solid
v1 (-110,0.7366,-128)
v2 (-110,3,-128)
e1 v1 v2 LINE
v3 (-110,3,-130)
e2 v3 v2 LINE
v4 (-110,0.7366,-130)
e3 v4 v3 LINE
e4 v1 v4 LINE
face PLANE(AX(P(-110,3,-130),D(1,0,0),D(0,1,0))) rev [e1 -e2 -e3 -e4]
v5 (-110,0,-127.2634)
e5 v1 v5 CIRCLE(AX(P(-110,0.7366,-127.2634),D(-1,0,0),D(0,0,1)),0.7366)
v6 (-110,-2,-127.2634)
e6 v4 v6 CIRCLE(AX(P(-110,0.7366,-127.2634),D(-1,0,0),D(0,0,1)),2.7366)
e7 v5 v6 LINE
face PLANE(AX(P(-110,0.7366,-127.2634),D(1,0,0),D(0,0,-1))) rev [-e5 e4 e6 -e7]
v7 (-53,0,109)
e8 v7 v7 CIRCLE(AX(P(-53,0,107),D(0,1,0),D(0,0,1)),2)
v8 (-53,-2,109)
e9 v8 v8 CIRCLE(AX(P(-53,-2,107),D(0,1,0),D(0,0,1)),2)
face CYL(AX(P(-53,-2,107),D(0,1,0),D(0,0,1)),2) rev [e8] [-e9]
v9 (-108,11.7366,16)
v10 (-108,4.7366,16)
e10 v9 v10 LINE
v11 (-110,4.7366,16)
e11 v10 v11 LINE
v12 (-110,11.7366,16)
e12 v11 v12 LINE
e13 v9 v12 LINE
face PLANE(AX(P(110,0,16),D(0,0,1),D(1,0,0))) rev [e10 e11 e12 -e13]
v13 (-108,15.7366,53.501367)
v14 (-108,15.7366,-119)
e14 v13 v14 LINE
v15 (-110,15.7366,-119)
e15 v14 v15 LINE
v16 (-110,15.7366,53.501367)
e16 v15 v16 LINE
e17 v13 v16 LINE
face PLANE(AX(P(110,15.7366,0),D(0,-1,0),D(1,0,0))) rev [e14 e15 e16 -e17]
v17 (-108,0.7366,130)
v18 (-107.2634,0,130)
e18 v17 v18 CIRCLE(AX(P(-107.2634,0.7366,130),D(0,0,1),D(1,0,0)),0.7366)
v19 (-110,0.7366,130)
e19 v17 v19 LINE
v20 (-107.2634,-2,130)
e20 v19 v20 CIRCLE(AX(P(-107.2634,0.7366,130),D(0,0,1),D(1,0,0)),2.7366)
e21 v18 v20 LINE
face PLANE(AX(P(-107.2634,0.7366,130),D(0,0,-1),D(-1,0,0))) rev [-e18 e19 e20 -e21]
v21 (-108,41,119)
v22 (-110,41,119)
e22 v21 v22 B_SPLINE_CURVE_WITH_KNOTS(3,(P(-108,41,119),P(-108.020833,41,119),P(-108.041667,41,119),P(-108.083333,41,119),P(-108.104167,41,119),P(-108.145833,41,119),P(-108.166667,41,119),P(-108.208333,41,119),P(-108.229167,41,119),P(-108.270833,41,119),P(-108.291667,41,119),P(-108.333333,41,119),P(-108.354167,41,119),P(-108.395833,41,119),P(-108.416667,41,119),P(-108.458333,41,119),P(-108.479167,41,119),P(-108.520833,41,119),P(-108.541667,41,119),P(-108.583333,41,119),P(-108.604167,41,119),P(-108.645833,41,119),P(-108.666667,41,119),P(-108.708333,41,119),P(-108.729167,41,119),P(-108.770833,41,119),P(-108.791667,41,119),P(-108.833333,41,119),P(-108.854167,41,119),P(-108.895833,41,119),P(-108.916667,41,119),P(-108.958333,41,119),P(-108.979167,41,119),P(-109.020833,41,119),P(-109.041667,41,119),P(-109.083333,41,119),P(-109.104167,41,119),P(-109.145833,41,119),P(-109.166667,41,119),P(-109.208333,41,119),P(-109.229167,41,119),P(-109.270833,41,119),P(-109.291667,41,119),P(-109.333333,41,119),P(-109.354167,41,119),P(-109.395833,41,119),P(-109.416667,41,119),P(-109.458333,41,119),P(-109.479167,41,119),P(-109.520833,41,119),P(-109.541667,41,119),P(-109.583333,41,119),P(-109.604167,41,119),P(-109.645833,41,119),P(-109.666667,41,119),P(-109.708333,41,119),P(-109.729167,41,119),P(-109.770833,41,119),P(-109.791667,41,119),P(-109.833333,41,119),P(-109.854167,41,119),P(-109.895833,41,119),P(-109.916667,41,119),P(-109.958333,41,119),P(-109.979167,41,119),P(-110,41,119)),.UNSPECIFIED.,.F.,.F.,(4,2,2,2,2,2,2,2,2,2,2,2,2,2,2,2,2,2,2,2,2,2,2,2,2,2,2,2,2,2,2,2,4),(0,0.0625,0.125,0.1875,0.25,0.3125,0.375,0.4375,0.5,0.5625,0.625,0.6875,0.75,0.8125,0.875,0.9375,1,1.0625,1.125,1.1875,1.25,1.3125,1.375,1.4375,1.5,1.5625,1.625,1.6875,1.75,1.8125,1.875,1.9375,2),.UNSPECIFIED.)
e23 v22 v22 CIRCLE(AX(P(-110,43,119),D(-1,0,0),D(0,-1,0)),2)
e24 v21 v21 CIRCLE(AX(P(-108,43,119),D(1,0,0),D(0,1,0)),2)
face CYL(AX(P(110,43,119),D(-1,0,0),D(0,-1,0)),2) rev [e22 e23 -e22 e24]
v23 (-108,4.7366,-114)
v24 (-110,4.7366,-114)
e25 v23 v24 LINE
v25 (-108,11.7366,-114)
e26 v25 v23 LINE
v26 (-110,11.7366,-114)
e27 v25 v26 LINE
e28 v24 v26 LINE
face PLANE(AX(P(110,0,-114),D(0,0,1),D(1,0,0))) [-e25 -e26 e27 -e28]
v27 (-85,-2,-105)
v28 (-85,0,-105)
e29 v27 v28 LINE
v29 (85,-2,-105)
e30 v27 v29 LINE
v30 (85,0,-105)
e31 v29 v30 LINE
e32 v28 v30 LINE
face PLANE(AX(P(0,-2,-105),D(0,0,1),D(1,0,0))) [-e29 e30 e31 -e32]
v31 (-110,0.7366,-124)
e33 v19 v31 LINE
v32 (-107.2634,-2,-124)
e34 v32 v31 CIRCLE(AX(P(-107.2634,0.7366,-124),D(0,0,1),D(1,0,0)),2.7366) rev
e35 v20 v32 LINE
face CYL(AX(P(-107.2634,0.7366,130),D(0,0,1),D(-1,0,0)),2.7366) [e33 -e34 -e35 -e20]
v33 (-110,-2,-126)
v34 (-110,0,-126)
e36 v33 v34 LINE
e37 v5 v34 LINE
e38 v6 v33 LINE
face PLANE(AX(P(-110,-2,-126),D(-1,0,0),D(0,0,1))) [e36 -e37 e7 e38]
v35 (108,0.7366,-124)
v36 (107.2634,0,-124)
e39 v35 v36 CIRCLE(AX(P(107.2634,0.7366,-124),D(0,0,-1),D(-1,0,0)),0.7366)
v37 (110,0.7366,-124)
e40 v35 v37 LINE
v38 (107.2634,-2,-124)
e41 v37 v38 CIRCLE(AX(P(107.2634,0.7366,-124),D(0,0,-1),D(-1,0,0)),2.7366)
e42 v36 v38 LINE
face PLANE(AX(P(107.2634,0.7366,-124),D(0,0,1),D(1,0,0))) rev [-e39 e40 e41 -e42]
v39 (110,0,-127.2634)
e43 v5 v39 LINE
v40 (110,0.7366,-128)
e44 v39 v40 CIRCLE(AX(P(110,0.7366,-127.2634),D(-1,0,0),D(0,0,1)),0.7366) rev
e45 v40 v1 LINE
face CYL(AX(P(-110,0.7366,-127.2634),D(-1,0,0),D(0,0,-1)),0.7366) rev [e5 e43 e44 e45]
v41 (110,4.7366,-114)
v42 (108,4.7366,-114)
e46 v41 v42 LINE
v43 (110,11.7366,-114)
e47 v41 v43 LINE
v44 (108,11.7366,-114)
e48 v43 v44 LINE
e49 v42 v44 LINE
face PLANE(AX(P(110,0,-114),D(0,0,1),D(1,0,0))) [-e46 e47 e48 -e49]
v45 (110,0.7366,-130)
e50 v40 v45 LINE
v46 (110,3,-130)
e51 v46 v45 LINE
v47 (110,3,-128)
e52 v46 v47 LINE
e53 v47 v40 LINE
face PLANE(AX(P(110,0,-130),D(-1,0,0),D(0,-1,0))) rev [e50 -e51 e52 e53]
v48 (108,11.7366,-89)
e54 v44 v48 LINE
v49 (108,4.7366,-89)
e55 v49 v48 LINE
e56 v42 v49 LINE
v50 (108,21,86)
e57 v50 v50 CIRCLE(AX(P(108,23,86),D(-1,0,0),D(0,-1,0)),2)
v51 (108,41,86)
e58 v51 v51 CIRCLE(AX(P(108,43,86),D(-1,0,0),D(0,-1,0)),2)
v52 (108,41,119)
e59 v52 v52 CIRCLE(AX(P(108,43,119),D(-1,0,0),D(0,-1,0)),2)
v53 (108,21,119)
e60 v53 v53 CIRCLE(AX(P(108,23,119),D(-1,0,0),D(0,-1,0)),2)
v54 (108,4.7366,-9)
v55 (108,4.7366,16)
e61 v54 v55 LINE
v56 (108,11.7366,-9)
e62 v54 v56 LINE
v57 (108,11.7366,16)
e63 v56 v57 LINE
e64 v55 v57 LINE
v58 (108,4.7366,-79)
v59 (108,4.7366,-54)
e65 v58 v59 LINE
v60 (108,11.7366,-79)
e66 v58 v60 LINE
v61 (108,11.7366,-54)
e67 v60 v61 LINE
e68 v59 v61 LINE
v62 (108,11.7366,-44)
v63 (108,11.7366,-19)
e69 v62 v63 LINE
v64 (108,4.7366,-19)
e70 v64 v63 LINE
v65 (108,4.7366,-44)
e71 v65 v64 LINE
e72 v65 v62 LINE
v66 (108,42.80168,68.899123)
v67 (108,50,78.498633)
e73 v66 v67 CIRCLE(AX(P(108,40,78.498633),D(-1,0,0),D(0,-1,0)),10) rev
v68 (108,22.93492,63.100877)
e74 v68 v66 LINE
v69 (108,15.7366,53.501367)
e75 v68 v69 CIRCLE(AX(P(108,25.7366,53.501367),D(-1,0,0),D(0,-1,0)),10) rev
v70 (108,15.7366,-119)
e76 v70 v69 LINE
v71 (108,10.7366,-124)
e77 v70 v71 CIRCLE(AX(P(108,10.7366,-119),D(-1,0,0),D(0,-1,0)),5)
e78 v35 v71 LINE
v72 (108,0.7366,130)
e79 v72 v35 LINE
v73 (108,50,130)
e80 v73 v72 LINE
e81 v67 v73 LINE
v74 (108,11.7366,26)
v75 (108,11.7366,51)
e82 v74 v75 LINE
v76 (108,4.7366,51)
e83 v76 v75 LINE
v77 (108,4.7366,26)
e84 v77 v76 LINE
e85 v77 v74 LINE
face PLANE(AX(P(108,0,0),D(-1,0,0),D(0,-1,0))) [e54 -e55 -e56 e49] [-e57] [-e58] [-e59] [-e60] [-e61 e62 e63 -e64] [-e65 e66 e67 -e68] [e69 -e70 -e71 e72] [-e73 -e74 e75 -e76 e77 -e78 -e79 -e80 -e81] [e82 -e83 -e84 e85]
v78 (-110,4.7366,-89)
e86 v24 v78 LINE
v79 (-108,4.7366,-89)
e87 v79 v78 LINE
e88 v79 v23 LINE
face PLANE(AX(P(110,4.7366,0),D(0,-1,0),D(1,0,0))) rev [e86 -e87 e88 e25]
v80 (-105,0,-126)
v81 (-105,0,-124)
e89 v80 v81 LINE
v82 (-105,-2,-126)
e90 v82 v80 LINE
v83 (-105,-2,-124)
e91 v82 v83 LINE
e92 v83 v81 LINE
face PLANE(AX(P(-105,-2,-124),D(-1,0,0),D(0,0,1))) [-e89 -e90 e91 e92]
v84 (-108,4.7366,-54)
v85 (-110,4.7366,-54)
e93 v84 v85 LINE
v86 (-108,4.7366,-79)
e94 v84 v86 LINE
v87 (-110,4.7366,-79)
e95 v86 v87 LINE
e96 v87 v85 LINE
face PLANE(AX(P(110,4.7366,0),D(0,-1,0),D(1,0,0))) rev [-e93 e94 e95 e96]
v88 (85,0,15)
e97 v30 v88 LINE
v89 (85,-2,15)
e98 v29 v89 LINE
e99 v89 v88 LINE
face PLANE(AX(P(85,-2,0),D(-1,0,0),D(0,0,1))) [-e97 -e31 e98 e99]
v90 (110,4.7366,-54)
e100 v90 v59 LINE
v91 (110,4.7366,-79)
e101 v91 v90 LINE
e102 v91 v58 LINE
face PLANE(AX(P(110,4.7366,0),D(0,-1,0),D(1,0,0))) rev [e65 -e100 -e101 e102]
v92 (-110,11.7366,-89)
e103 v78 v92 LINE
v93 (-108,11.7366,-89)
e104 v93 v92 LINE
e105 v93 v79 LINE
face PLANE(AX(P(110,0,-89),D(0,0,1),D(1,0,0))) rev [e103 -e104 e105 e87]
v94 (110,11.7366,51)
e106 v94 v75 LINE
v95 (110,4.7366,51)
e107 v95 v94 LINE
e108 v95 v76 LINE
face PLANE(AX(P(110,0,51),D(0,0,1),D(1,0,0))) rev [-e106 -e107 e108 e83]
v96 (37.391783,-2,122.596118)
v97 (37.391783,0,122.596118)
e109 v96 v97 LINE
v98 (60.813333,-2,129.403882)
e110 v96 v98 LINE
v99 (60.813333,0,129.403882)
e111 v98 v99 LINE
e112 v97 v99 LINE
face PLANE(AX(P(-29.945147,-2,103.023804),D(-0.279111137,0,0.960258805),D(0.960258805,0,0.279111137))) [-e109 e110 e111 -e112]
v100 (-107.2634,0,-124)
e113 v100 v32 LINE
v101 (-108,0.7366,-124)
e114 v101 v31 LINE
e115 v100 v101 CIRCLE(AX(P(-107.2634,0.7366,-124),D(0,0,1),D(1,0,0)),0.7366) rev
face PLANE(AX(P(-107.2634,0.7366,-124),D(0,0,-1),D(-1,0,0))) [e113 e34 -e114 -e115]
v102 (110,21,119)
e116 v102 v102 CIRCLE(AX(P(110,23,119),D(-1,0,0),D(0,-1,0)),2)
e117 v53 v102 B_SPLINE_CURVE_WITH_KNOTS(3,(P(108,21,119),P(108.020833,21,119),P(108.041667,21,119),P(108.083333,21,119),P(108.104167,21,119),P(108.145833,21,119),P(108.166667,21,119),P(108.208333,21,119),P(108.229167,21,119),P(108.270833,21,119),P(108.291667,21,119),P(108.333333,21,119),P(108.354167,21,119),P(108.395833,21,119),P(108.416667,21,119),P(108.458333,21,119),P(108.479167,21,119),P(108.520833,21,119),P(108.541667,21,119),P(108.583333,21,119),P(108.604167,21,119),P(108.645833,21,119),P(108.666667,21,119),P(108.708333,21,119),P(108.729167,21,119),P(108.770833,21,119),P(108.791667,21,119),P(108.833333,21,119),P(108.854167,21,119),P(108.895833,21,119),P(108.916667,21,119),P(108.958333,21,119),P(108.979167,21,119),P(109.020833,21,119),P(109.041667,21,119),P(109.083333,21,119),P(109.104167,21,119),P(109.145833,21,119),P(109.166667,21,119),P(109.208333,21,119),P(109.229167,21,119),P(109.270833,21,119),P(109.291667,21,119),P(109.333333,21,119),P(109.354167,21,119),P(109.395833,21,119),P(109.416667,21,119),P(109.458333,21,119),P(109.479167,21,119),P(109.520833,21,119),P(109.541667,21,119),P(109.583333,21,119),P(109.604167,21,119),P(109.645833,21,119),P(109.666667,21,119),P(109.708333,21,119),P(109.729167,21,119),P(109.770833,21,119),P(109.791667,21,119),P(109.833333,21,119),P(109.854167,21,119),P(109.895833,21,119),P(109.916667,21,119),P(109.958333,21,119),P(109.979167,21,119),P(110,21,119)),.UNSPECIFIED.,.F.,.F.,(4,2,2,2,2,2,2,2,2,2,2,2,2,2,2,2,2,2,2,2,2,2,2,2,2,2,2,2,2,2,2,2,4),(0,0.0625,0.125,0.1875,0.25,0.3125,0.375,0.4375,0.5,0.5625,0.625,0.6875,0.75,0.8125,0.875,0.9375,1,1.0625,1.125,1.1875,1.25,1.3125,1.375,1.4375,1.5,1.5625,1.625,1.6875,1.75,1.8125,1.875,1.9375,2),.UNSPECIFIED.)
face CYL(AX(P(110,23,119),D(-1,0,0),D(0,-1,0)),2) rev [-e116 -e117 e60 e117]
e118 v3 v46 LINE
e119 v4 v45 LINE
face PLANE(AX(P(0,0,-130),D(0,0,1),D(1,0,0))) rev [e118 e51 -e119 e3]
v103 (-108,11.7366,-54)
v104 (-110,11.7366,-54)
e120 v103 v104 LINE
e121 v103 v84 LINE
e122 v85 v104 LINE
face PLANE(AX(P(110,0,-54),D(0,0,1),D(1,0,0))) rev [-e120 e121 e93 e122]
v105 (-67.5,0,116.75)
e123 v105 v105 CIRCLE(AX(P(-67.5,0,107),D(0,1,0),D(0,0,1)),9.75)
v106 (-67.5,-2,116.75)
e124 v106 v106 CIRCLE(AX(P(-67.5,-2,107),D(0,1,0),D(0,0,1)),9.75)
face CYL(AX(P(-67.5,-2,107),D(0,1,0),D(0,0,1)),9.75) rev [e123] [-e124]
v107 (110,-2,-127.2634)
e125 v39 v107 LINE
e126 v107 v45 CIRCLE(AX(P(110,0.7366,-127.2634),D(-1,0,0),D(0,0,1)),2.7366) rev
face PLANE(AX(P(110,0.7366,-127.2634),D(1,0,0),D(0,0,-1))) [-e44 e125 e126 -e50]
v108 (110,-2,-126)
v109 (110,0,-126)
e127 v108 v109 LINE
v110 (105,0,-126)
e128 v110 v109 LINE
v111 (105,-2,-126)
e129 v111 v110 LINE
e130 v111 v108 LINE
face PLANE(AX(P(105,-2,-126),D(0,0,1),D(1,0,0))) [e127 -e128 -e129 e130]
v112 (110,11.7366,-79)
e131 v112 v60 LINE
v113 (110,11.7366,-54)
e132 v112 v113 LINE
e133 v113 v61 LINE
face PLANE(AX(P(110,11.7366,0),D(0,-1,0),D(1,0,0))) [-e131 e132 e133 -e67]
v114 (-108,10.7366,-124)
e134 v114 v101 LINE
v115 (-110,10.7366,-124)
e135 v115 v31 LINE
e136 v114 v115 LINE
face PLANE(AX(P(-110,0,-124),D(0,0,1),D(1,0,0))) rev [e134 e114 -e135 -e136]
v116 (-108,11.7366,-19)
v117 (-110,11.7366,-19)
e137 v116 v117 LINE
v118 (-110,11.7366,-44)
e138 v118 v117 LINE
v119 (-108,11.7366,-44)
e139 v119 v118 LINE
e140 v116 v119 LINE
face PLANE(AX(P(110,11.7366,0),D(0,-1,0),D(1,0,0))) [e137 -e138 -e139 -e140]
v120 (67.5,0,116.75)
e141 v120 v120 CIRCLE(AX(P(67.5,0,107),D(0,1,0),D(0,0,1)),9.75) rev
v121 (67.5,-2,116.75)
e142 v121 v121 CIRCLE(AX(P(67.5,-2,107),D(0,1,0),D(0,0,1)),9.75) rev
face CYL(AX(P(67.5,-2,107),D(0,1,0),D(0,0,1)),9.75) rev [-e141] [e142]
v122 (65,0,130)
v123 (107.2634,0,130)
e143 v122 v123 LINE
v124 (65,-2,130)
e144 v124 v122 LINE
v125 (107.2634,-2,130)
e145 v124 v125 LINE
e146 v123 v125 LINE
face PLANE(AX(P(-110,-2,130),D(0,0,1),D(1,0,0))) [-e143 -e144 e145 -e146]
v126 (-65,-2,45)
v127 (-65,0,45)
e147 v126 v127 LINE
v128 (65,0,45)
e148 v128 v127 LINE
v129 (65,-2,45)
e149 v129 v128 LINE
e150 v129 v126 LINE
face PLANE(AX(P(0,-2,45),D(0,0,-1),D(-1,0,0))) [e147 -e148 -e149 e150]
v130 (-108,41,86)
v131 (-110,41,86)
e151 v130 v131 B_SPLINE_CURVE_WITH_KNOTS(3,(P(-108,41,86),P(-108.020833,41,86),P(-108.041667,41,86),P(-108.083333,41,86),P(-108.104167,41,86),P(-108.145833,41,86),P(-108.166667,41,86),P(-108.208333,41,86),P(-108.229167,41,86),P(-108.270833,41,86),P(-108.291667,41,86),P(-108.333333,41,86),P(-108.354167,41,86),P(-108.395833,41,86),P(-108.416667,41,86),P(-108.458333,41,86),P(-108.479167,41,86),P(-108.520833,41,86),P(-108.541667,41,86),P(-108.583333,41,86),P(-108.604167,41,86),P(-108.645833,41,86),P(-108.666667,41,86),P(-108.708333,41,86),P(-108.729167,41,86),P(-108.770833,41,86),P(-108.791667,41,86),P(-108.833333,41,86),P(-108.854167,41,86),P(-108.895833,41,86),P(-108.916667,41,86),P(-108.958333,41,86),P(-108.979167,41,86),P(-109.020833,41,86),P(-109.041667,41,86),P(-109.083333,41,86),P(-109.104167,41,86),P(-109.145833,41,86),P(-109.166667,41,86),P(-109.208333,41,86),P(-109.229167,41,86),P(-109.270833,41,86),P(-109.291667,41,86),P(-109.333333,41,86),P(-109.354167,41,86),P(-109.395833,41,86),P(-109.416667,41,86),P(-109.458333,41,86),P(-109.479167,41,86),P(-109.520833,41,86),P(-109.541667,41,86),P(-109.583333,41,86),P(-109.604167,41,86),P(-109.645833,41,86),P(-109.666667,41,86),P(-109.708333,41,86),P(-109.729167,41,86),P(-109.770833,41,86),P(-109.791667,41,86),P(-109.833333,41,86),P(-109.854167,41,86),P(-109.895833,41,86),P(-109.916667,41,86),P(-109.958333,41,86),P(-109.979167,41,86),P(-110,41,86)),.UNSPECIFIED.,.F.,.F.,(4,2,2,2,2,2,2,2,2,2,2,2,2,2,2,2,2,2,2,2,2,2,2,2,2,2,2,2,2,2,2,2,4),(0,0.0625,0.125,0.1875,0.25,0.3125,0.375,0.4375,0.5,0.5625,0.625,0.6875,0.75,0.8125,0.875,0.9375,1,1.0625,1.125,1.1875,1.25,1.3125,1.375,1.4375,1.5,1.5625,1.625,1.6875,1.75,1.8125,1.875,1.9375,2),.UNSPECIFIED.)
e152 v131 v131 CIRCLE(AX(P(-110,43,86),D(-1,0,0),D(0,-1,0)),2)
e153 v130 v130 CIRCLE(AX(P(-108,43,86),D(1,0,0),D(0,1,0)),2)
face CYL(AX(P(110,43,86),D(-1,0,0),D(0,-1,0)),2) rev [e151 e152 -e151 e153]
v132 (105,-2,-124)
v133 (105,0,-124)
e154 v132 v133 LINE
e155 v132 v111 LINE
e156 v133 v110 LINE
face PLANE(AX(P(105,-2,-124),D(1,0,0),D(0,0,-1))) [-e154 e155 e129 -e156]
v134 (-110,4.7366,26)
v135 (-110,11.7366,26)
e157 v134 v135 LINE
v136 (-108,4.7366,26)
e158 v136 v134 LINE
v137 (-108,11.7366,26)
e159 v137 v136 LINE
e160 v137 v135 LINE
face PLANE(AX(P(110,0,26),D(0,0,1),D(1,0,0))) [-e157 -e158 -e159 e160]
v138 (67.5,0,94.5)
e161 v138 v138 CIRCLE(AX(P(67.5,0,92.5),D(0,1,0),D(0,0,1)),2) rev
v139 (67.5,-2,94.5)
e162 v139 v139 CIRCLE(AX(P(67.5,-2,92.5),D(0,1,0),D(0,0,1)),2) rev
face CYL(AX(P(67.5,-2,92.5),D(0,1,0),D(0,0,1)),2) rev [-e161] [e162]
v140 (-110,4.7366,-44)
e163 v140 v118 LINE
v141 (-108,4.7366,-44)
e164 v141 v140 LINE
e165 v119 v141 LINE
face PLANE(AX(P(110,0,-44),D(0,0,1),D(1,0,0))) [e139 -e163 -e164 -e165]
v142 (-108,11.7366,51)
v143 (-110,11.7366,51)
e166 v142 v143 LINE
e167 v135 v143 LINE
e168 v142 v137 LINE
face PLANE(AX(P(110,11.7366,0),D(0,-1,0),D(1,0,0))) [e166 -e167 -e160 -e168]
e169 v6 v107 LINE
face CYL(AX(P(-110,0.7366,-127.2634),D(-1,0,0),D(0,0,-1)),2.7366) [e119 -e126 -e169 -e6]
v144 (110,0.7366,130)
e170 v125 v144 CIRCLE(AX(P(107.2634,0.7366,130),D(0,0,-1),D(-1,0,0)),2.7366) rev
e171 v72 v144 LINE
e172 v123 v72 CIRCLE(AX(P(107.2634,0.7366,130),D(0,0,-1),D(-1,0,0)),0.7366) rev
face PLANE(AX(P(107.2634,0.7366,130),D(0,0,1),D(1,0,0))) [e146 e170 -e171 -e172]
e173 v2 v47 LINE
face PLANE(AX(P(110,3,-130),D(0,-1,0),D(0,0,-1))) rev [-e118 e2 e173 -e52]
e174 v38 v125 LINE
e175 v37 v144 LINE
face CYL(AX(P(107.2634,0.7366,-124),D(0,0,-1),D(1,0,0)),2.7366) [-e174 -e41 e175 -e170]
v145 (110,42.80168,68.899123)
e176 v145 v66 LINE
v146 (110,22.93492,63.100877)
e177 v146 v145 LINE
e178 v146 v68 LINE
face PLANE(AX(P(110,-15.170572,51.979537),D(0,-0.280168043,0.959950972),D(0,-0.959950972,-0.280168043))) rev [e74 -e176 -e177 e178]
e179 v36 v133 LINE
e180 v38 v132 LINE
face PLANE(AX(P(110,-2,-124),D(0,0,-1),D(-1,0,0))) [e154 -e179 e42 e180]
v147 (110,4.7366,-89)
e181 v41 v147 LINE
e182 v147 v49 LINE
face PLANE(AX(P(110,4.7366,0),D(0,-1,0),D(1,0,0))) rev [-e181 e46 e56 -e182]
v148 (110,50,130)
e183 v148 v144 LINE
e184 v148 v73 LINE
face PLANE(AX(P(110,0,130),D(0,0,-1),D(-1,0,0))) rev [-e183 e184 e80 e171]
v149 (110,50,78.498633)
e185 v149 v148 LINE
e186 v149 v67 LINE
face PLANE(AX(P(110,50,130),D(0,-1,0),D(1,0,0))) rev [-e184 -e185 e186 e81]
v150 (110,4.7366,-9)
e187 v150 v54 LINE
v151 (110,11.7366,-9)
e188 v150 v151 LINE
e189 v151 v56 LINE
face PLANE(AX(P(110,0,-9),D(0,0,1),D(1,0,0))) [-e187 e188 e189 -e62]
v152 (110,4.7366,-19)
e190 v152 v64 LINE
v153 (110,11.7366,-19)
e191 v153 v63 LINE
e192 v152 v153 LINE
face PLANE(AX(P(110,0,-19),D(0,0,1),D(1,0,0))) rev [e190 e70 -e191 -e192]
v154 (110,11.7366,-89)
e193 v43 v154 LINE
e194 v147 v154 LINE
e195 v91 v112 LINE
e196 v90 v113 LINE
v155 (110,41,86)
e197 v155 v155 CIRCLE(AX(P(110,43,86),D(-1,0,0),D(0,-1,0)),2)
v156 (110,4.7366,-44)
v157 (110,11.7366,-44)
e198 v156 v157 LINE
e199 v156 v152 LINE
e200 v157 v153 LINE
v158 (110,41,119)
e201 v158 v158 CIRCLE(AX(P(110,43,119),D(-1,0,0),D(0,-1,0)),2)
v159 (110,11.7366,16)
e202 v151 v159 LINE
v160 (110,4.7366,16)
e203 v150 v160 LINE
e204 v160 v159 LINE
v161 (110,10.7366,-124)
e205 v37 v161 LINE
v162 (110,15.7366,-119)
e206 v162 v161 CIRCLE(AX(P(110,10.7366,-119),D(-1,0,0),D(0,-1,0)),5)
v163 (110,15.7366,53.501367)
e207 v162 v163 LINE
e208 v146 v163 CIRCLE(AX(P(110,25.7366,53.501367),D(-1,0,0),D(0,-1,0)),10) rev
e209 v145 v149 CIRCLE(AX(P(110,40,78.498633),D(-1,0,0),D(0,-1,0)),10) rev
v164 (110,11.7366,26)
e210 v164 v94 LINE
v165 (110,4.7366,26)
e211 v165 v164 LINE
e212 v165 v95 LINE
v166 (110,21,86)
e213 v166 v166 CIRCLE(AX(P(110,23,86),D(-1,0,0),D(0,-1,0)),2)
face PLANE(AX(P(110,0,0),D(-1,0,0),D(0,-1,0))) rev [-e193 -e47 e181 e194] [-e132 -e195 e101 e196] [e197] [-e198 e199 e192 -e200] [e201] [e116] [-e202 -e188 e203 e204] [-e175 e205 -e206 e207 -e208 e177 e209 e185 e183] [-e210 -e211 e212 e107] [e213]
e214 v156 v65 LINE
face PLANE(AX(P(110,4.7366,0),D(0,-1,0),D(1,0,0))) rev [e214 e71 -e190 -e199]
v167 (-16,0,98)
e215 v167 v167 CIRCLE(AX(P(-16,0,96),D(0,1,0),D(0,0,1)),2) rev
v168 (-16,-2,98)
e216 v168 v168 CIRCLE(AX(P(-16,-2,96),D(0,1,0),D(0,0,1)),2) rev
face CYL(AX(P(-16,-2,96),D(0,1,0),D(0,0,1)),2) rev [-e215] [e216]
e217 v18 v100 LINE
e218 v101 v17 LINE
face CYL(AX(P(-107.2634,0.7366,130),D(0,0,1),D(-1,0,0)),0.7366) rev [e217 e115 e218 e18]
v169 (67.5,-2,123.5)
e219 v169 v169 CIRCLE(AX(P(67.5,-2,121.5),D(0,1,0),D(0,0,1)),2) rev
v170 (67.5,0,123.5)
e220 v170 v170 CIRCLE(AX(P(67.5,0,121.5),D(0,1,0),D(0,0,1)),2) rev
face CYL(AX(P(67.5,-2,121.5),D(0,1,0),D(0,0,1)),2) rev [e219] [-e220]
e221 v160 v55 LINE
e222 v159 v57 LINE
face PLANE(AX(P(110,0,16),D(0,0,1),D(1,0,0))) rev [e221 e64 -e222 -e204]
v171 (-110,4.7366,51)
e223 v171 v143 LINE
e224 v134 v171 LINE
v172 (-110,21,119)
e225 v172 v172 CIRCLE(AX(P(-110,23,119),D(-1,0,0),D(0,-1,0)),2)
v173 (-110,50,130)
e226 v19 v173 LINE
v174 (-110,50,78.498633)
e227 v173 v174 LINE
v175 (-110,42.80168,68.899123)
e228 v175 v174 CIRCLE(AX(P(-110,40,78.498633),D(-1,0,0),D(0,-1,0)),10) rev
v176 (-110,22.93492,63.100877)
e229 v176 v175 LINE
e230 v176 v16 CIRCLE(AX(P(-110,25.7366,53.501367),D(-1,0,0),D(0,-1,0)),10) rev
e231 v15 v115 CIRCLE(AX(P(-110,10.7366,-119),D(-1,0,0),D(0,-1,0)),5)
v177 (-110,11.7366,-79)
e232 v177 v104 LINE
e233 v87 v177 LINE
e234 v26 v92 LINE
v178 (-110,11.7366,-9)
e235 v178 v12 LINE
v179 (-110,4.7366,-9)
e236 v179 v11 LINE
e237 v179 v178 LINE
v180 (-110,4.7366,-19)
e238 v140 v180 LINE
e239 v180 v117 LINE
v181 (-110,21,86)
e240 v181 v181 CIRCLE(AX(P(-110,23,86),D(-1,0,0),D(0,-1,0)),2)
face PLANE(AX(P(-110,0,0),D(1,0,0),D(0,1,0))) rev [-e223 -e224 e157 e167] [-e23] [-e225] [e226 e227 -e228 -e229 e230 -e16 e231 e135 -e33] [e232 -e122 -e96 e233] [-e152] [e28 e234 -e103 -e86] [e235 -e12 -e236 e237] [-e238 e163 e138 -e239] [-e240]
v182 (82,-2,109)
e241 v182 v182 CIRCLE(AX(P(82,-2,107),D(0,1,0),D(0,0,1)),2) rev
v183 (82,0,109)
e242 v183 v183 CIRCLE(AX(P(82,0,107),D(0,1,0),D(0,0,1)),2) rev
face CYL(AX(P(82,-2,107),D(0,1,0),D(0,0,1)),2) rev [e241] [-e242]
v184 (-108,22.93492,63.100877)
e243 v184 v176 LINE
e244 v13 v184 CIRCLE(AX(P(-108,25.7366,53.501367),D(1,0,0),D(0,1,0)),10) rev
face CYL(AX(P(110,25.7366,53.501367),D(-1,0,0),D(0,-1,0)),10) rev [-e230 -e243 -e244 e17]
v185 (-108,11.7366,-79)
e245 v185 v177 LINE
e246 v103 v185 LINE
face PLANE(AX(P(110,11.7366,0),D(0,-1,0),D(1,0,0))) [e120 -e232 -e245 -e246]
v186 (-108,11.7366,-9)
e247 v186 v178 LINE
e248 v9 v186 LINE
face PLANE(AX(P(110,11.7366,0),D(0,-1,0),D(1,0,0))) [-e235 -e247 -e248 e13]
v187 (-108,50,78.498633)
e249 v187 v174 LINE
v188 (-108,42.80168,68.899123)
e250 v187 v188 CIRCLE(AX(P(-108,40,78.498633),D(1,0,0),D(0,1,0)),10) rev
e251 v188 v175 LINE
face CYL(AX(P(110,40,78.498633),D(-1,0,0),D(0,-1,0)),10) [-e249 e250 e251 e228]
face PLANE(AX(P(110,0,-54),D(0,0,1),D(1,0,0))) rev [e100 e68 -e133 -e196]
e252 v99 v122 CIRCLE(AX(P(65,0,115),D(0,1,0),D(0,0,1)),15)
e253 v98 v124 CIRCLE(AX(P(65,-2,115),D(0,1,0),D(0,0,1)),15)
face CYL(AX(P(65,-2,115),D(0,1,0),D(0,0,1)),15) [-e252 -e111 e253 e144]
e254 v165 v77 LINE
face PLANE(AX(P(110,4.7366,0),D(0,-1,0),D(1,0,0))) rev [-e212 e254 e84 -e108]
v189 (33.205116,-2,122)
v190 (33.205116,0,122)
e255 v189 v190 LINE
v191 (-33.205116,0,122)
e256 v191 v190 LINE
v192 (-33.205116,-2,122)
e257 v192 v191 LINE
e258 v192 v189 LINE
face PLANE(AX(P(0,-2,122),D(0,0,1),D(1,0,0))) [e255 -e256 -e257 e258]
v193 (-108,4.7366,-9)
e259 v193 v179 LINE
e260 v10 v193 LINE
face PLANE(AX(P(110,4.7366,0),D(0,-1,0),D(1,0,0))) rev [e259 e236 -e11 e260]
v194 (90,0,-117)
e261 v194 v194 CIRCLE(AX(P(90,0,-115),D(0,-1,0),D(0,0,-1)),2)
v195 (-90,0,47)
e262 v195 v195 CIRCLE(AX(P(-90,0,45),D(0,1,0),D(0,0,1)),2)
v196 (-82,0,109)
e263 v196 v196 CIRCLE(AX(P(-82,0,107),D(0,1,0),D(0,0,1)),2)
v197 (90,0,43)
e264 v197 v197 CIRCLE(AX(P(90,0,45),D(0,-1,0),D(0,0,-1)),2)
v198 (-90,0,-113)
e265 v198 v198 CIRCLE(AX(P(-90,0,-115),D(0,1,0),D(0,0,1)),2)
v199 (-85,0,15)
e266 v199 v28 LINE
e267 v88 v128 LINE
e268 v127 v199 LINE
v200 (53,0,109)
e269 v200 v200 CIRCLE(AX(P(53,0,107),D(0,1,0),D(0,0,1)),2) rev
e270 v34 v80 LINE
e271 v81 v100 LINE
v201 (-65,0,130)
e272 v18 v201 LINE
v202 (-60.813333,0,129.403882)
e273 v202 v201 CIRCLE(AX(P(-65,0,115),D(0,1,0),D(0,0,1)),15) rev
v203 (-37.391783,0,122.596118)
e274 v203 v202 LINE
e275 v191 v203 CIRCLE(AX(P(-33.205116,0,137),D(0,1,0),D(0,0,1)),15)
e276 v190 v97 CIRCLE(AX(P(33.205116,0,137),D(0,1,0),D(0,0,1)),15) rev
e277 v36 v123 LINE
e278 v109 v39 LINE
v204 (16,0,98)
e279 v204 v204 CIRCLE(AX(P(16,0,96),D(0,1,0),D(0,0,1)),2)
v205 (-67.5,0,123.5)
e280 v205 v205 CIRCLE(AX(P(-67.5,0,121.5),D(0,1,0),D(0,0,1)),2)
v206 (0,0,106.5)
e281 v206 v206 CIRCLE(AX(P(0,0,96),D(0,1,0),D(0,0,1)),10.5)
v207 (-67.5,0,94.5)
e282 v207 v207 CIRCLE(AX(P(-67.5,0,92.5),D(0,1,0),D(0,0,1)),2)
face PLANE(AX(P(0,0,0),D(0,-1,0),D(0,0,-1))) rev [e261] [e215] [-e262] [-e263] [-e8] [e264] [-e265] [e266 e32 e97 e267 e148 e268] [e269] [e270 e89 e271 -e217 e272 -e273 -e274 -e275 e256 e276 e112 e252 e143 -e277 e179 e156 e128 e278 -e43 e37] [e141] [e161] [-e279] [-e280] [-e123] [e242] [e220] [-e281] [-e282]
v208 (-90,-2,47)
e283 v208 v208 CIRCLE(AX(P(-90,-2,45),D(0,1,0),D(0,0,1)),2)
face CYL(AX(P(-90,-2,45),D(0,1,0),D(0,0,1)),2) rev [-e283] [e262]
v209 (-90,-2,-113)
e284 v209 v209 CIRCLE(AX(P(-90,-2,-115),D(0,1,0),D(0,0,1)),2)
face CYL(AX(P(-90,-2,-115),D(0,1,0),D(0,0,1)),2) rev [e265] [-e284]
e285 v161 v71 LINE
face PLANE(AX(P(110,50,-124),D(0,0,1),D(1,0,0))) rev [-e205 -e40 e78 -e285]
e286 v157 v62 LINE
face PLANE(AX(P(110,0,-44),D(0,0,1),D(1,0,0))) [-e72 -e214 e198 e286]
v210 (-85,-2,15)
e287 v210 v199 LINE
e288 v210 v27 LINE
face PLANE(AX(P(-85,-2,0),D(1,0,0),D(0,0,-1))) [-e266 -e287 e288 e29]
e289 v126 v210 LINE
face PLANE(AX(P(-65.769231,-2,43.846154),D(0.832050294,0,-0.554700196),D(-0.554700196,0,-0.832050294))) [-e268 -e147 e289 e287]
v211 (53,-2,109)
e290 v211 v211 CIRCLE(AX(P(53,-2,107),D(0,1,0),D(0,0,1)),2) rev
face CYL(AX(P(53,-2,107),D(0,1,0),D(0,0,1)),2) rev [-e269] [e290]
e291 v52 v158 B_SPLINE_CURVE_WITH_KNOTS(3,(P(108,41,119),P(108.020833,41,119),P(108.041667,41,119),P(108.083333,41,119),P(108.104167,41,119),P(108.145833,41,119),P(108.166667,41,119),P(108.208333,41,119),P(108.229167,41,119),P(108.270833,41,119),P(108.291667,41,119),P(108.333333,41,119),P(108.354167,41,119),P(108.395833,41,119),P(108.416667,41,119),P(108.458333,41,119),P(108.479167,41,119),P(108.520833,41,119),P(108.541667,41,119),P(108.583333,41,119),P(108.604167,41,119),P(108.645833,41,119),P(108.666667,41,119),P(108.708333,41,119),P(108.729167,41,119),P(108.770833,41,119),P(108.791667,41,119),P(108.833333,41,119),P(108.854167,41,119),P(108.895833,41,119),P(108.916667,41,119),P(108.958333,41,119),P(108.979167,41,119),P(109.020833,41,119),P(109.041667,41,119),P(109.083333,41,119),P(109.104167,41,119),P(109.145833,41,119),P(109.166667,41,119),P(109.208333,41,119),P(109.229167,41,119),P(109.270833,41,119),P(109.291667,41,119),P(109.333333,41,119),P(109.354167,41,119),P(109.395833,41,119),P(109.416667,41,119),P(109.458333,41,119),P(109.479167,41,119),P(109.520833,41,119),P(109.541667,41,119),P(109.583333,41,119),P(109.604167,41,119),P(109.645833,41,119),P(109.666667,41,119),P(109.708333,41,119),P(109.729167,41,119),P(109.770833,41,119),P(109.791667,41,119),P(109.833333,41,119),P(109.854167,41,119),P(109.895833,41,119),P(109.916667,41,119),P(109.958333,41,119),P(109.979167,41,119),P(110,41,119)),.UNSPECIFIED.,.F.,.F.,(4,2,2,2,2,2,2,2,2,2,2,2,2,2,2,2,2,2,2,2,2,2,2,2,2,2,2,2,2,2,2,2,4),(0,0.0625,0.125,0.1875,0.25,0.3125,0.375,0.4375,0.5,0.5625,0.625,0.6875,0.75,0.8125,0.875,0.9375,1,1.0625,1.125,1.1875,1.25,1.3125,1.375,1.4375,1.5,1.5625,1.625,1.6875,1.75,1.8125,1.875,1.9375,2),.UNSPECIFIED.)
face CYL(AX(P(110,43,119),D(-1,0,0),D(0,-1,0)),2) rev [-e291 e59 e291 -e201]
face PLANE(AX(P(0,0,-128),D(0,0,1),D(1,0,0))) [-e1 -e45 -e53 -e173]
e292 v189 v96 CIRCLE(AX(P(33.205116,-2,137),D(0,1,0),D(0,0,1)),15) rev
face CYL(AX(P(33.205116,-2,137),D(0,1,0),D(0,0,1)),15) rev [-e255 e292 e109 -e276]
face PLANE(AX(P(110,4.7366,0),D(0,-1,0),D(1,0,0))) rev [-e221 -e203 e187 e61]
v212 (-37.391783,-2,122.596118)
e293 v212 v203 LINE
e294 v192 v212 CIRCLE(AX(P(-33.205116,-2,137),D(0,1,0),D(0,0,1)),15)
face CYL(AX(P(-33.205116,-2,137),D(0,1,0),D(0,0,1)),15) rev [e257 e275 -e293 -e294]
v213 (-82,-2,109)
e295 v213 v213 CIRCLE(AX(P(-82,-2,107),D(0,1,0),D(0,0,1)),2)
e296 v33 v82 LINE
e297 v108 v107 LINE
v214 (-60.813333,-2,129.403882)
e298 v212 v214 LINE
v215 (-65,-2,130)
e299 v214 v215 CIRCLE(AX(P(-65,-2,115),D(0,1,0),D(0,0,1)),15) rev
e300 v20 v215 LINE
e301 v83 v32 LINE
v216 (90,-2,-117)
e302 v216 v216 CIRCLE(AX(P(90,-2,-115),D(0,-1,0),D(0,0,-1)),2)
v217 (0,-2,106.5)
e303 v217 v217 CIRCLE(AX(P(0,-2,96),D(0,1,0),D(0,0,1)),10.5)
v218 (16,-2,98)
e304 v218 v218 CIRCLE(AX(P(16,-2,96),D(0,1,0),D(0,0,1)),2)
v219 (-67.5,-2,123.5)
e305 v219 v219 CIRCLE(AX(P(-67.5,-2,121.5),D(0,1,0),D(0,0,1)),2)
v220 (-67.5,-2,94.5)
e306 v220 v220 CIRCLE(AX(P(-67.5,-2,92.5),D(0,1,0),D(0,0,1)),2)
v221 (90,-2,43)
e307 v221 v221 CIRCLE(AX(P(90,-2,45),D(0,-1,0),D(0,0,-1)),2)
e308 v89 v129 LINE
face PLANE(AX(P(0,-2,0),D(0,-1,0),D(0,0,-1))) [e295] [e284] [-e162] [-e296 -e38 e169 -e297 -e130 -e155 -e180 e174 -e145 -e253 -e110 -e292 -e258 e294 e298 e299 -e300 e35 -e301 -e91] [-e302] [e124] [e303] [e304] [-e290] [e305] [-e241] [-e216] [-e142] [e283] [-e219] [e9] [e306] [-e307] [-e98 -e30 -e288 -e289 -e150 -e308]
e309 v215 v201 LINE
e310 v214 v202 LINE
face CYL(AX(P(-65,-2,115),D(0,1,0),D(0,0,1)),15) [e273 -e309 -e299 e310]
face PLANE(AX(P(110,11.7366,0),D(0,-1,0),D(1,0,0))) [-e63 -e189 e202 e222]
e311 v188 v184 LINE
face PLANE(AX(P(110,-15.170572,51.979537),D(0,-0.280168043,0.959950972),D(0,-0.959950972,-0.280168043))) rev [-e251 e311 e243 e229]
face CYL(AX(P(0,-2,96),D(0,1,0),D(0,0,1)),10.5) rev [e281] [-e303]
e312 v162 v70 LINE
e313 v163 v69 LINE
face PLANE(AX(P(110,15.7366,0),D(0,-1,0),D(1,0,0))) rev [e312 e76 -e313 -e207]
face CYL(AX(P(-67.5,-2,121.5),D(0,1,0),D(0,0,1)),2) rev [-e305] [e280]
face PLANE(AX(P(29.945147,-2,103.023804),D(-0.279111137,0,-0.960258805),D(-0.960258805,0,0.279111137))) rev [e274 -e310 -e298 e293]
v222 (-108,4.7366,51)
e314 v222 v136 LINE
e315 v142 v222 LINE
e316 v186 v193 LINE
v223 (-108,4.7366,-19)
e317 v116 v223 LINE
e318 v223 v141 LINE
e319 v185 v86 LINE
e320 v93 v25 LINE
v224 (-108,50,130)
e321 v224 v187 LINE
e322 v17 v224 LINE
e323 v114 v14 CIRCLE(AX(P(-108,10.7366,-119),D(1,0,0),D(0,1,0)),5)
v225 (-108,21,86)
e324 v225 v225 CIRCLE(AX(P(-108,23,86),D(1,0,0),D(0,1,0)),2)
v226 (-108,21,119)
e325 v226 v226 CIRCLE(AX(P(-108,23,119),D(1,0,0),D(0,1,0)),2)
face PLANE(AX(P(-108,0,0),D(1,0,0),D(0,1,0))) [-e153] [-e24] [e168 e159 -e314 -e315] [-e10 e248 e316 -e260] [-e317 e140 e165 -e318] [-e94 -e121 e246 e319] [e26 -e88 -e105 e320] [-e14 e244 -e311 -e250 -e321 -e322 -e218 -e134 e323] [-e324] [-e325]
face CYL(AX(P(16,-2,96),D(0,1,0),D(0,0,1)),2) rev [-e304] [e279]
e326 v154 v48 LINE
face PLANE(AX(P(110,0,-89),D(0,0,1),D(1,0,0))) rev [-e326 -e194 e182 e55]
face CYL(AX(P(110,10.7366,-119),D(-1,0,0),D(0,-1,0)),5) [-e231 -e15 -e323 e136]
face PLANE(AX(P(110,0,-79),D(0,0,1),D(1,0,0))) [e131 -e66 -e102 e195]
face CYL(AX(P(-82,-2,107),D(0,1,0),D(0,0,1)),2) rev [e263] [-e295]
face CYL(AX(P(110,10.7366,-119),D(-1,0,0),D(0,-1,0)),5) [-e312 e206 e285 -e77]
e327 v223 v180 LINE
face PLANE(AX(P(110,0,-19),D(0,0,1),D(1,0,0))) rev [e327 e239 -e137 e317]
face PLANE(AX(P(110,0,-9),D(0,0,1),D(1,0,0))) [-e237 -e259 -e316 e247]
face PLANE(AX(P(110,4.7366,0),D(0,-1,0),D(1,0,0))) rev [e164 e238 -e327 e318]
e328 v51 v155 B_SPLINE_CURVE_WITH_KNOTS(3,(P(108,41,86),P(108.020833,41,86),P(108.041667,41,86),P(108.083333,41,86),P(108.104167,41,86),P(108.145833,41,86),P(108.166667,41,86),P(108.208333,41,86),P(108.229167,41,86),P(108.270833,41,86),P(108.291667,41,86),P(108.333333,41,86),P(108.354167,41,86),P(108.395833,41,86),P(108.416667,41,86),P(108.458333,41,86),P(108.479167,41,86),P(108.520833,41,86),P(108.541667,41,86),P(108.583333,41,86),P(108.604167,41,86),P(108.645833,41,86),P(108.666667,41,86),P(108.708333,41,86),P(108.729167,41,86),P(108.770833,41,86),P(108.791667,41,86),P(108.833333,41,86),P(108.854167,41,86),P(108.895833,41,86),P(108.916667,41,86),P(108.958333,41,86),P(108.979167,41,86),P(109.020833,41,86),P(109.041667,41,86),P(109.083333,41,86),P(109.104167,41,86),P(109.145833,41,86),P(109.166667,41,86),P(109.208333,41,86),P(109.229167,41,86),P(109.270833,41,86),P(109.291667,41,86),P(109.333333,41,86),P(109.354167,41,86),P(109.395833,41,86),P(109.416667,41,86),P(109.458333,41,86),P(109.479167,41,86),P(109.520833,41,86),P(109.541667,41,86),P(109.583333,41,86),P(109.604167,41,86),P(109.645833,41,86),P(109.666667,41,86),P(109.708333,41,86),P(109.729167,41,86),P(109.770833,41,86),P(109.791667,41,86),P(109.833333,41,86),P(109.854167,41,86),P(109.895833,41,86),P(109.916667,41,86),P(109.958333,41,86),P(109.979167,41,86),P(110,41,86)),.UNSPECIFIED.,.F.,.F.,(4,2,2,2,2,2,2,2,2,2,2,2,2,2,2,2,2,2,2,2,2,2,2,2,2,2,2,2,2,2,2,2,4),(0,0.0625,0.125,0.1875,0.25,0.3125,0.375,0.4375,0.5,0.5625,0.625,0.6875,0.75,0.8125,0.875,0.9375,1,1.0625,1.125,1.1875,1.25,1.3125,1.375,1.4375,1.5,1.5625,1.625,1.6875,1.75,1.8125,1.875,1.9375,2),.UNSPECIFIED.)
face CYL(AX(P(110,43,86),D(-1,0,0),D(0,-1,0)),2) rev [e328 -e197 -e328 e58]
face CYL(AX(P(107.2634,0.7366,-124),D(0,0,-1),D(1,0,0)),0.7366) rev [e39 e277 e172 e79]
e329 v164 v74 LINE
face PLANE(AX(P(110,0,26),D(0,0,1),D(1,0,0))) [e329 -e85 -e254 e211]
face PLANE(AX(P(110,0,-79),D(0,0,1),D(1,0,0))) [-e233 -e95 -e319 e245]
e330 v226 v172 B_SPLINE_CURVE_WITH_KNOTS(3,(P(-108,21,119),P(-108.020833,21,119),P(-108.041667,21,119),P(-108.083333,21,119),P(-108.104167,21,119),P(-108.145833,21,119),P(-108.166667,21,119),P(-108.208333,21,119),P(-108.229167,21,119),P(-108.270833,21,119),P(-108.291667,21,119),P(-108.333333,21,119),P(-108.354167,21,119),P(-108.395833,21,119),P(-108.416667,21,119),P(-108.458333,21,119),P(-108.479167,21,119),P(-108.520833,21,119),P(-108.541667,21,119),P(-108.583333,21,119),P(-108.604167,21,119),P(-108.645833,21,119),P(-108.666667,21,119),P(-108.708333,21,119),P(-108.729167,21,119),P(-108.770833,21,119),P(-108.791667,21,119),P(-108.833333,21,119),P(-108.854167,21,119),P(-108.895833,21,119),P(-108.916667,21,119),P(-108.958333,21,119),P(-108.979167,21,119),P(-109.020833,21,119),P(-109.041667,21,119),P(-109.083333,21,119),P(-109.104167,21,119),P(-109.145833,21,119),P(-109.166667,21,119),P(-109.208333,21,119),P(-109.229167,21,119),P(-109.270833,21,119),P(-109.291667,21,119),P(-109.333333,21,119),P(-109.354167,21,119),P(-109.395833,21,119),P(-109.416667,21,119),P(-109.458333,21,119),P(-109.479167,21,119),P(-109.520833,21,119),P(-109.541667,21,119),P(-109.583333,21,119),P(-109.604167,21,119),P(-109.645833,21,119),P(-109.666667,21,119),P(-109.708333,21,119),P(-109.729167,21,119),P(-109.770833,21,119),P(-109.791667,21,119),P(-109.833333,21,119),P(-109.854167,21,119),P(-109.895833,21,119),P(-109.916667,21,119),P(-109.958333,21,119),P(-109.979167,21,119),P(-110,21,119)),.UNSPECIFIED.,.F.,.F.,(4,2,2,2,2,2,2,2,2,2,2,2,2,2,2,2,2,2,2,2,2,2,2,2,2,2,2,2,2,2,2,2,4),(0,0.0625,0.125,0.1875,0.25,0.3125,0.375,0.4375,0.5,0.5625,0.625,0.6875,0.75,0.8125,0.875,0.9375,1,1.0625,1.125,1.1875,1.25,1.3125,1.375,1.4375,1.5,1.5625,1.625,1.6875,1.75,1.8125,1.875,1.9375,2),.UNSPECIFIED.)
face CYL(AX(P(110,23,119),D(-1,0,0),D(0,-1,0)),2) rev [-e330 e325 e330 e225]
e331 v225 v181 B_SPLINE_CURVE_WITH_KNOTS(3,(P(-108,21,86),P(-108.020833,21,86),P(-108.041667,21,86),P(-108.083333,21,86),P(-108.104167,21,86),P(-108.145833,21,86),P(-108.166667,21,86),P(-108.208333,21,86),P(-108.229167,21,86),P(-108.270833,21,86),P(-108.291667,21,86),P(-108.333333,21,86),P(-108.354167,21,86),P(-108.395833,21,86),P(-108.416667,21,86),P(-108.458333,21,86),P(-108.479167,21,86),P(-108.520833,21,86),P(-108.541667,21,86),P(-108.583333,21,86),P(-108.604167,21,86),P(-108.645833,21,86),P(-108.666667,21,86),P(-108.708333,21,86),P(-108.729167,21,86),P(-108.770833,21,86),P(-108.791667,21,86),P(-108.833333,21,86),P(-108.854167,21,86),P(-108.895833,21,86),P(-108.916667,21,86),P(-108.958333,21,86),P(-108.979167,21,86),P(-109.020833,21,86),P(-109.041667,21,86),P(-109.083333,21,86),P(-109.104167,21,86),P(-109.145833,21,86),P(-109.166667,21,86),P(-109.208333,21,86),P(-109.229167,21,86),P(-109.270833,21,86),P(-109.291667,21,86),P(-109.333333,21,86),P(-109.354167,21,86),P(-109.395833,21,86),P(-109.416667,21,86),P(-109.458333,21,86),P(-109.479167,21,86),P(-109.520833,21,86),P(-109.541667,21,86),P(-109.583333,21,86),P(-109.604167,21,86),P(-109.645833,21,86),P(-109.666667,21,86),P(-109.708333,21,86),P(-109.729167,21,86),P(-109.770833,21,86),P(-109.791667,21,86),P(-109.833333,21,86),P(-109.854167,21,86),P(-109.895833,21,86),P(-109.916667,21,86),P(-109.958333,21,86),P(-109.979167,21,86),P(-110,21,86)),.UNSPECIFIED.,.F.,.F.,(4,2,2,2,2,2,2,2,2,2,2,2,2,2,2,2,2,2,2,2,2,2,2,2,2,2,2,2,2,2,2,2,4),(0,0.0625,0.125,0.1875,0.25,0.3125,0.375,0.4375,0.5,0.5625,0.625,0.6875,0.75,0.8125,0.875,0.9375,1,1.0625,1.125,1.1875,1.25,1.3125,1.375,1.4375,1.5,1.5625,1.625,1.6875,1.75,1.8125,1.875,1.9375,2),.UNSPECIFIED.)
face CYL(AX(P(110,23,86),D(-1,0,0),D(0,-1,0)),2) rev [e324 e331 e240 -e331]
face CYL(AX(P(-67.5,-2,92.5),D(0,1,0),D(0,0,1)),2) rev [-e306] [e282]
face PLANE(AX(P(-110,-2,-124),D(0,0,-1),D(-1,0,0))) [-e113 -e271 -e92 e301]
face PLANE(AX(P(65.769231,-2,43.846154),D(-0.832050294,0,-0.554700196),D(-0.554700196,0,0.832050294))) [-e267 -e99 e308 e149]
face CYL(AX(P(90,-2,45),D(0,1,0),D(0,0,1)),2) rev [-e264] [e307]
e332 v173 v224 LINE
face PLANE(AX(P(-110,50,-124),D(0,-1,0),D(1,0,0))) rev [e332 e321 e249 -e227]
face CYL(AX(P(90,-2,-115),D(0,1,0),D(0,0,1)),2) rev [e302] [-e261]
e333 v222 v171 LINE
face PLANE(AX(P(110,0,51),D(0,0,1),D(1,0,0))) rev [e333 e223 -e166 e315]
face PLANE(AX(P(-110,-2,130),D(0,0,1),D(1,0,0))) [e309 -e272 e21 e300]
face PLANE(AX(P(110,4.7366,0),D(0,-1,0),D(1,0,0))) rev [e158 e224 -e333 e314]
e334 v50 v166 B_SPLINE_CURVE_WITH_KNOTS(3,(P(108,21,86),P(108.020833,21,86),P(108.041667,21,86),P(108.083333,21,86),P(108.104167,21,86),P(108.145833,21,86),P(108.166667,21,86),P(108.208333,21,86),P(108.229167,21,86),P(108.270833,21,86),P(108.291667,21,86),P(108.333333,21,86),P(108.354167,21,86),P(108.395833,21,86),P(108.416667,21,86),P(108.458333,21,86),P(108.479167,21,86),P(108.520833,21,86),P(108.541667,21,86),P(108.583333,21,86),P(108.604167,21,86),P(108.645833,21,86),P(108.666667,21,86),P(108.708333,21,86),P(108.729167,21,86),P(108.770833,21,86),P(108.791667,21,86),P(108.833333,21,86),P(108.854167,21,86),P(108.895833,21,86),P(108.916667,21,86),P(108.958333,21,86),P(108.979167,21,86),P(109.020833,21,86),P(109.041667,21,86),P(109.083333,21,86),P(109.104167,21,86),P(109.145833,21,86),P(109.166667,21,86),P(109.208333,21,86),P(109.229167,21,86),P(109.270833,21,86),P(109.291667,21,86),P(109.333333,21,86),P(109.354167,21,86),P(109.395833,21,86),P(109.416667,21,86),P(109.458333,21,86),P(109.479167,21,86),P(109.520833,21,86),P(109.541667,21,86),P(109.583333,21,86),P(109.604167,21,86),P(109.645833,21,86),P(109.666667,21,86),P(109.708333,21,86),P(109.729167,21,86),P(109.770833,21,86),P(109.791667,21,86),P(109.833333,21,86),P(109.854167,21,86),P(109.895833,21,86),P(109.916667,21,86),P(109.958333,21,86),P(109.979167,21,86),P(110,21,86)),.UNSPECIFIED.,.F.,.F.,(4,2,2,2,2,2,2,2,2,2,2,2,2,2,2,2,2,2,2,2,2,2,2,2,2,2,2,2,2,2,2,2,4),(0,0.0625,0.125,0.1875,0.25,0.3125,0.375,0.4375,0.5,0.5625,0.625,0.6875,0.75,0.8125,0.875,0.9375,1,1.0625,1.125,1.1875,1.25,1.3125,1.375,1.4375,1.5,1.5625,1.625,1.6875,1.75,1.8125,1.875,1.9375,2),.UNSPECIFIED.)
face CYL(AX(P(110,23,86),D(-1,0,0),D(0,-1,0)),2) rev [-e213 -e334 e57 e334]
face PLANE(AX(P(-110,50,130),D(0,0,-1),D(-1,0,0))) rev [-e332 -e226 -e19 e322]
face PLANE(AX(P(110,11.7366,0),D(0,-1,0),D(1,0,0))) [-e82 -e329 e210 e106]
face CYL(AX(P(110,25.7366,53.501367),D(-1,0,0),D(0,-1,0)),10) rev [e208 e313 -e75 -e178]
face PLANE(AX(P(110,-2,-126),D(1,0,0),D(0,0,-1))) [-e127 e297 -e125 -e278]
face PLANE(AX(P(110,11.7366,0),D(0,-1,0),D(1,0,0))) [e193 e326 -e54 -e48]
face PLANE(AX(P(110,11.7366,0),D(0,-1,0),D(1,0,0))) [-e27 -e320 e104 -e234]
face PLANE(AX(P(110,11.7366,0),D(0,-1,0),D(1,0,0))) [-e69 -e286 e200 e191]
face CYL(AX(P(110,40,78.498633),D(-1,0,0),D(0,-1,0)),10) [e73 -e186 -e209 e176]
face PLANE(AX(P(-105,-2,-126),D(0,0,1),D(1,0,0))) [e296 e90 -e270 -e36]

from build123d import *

# Parameters (mm, degrees)
BASE_FLANGE1_START             = -2
BASE_FLANGE1_DEPTH             = 2
EDGE_FLANGE1_STRIP_W           = 9.4732
EDGE_FLANGE1_STRIP_H           = 2
EDGE_FLANGE1_STRIP_CUT_DEPTH   = 254
EDGE_FLANGE1_STRIP_2_W         = 9.4732
EDGE_FLANGE1_STRIP_2_H         = 2
EDGE_FLANGE1_STRIP_CUT_2_DEPTH = 254
EDGE_FLANGE1_DEPTH             = 254
EDGE_FLANGE1_BEND_DEPTH        = 254
EDGE_FLANGE2_STRIP_W           = 9.4732
EDGE_FLANGE2_STRIP_H           = 2
EDGE_FLANGE2_STRIP_CUT_DEPTH   = 220
EDGE_FLANGE2_DEPTH             = 220
SKETCH15_R                     = 2
SKETCH15_R_2                   = 9.75
CUT_EXTRUDE1_DEPTH             = 178.482393493
SKETCH16_W                     = 25
SKETCH16_H                     = 7
SKETCH16_R                     = 2
CUT_EXTRUDE2_DEPTH             = 261.384331326


# Read off the part's stored shape, not the designer's step: Base-Flange1
# Sheet-metal steps are written as plain solids
with BuildPart() as part:
    # Base-Flange1 outline → Base-Flange1 (new body)
    with BuildSketch(Plane(origin=(0, 0, 0), x_dir=(1, 0, 0), z_dir=(0, 1, 0)).offset(BASE_FLANGE1_START)):
        Polygon((105, 126), (110, 126), (110, 130), (-110, 130), (-110, 126), (-105, 126), (-105, 124), (-110, 124), (-110, -130), (110, -130), (110, 124), (105, 124), align=None)
    extrude(amount=BASE_FLANGE1_DEPTH)

    # Edge-Flange1 strip (across the edge) → Edge-Flange1 strip cut (cut)
    with BuildSketch(Plane(origin=(-110, 0, -124), x_dir=(1, 0, 0), z_dir=(0, 0, 1))):
        with Locations((-2, -1)):
            Rectangle(EDGE_FLANGE1_STRIP_W, EDGE_FLANGE1_STRIP_H)
    extrude(amount=EDGE_FLANGE1_STRIP_CUT_DEPTH, mode=Mode.SUBTRACT)

    # Edge-Flange1 strip 2 (across the edge) → Edge-Flange1 strip cut 2 (cut)
    with BuildSketch(Plane(origin=(110, 0, 130), x_dir=(-1, 0, 0), z_dir=(0, 0, -1))):
        with Locations((-2, -1)):
            Rectangle(EDGE_FLANGE1_STRIP_2_W, EDGE_FLANGE1_STRIP_2_H)
    extrude(amount=EDGE_FLANGE1_STRIP_CUT_2_DEPTH, mode=Mode.SUBTRACT)

    # Edge-Flange1 section (across the edge) → Edge-Flange1 (add)
    with BuildSketch(Plane(origin=(-110, 0, -124), x_dir=(1, 0, 0), z_dir=(0, 0, 1))):
        with BuildLine():
            Line((0, 0.7366), (0, 50))
            Line((0, 50), (2, 50))
            Line((2, 50), (2, 0.7366))
            ThreePointArc((2, 0.7366), (2.215745145, 0.215745145), (2.7366, 0))
            Line((2.7366, 0), (2.7366, -2))
            ThreePointArc((2.7366, -2), (0.801531583, -1.198468417), (0, 0.7366))
        make_face()
    extrude(amount=EDGE_FLANGE1_DEPTH)

    # Edge-Flange1 section 2 (across the edge) → Edge-Flange1 bend (add)
    with BuildSketch(Plane(origin=(110, 0, 130), x_dir=(-1, 0, 0), z_dir=(0, 0, -1))):
        with BuildLine():
            Line((0, 0.7366), (0, 50))
            Line((0, 50), (2, 50))
            Line((2, 50), (2, 0.7366))
            ThreePointArc((2, 0.7366), (2.215745145, 0.215745145), (2.7366, 0))
            Line((2.7366, 0), (2.7366, -2))
            ThreePointArc((2.7366, -2), (0.801531583, -1.198468417), (0, 0.7366))
        make_face()
    extrude(amount=EDGE_FLANGE1_BEND_DEPTH)

    # Edge-Flange2 strip (across the edge) → Edge-Flange2 strip cut (cut)
    with BuildSketch(Plane(origin=(110, 0, -130), x_dir=(0, 0, 1), z_dir=(-1, 0, 0))):
        with Locations((-2, -1)):
            Rectangle(EDGE_FLANGE2_STRIP_W, EDGE_FLANGE2_STRIP_H)
    extrude(amount=EDGE_FLANGE2_STRIP_CUT_DEPTH, mode=Mode.SUBTRACT)

    # Edge-Flange2 section (across the edge) → Edge-Flange2 (add)
    with BuildSketch(Plane(origin=(110, 0, -130), x_dir=(0, 0, 1), z_dir=(-1, 0, 0))):
        with BuildLine():
            Line((0, 0.7366), (0, 3))
            Line((0, 3), (2, 3))
            Line((2, 3), (2, 0.7366))
            ThreePointArc((2, 0.7366), (2.215745145, 0.215745145), (2.7366, 0))
            Line((2.7366, 0), (2.7366, -2))
            ThreePointArc((2.7366, -2), (0.801531583, -1.198468417), (0, 0.7366))
        make_face()
    extrude(amount=EDGE_FLANGE2_DEPTH)

    # Sketch15 → Cut-Extrude1 (cut, through all)
    with BuildSketch(Plane(origin=(0, 0, 0), x_dir=(1, 0, 0), z_dir=(0, 1, 0))):
        Polygon((-85, -15), (-85, 105), (85, 105), (85, -15), (65, -45), (-65, -45), align=None)
        with Locations(Location((82, -107, 0), (0, 0, 270))):
            Circle(SKETCH15_R)
        with Locations(Location((67.5, -92.5, 0), (0, 0, 270))):
            Circle(SKETCH15_R)
        with Locations(Location((53, -107, 0), (0, 0, 270))):
            Circle(SKETCH15_R)
        with Locations(Location((67.5, -121.5, 0), (0, 0, 270))):
            Circle(SKETCH15_R)
        with Locations(Location((67.5, -107, 0), (0, 0, 270))):
            Circle(SKETCH15_R_2)
        with BuildLine():
            ThreePointArc((0, -85.5), (-10.5, -96), (0, -106.5))
            Line((0, -106.5), (0, -85.5))
        make_face()
        with BuildLine():
            Line((0, -85.5), (0, -106.5))
            ThreePointArc((0, -106.5), (7.424621202, -103.424621202), (10.5, -96))
            ThreePointArc((10.5, -96), (7.424621202, -88.575378798), (0, -85.5))
        make_face()
        with BuildLine():
            Line((0, -122), (0, -130))
            Line((0, -130), (65, -130))
            ThreePointArc((65, -130), (62.885553403, -129.850222745), (60.81333294, -129.403882079))
            Line((60.81333294, -129.403882079), (37.391782876, -122.596117921))
            ThreePointArc((37.391782876, -122.596117921), (35.319562413, -122.149777255), (33.205115817, -122))
            Line((33.205115817, -122), (0, -122))
        make_face()
        with BuildLine():
            Line((-65, -130), (0, -130))
            Line((0, -130), (0, -122))
            Line((0, -122), (-33.205115817, -122))
            ThreePointArc((-33.205115817, -122), (-35.319562413, -122.149777255), (-37.391782876, -122.596117921))
            Line((-37.391782876, -122.596117921), (-60.81333294, -129.403882079))
            ThreePointArc((-60.81333294, -129.403882079), (-62.885553403, -129.850222745), (-65, -130))
        make_face()
        with Locations(Location((16, -96, 0), (0, 0, 270))):
            Circle(SKETCH15_R)
        with Locations(Location((-16, -96, 0), (0, 0, 270))):
            Circle(SKETCH15_R)
        with Locations(Location((-67.5, -107, 0), (0, 0, 270))):
            Circle(SKETCH15_R_2)
        with Locations(Location((-53, -107, 0), (0, 0, 270))):
            Circle(SKETCH15_R)
        with Locations(Location((-67.5, -92.5, 0), (0, 0, 270))):
            Circle(SKETCH15_R)
        with Locations(Location((-67.5, -121.5, 0), (0, 0, 270))):
            Circle(SKETCH15_R)
        with Locations(Location((-82, -107, 0), (0, 0, 270))):
            Circle(SKETCH15_R)
        with Locations(Location((-90, -45, 0), (0, 0, 270))):
            Circle(SKETCH15_R)
        with Locations(Location((90, 115, 0), (0, 0, 90))):
            Circle(SKETCH15_R)
        with Locations(Location((90, -45, 0), (0, 0, 90))):
            Circle(SKETCH15_R)
        with Locations(Location((-90, 115, 0), (0, 0, 270))):
            Circle(SKETCH15_R)
    extrude(amount=-CUT_EXTRUDE1_DEPTH, mode=Mode.SUBTRACT)

    # Sketch16 → Cut-Extrude2 (cut, through all)
    with BuildSketch(Plane.ZY.offset(110)):
        with BuildLine():
            ThreePointArc((-124, 10.7366), (-122.535533906, 14.272133906), (-119, 15.7366))
            Line((-119, 15.7366), (53.501367481, 15.7366))
            ThreePointArc((53.501367481, 15.7366), (59.500667262, 17.736074884), (63.100877196, 22.934919573))
            Line((63.100877196, 22.934919573), (68.899122804, 42.801680427))
            ThreePointArc((68.899122804, 42.801680427), (72.499332738, 48.000525116), (78.498632519, 50))
            Line((78.498632519, 50), (-124, 50))
            Line((-124, 50), (-124, 10.7366))
        make_face()
        with Locations((38.5, 8.2366)):
            Rectangle(SKETCH16_W, SKETCH16_H)
        with Locations((3.5, 8.2366)):
            Rectangle(SKETCH16_W, SKETCH16_H)
        with Locations((-31.5, 8.2366)):
            Rectangle(SKETCH16_W, SKETCH16_H)
        with Locations((-66.5, 8.2366)):
            Rectangle(SKETCH16_W, SKETCH16_H)
        with Locations((-101.5, 8.2366)):
            Rectangle(SKETCH16_W, SKETCH16_H)
        with Locations(Location((86, 43, 0), (0, 0, 270))):
            Circle(SKETCH16_R)
        with Locations(Location((86, 23, 0), (0, 0, 270))):
            Circle(SKETCH16_R)
        with Locations(Location((119, 43, 0), (0, 0, 270))):
            Circle(SKETCH16_R)
        with Locations(Location((119, 23, 0), (0, 0, 270))):
            Circle(SKETCH16_R)
    extrude(amount=-CUT_EXTRUDE2_DEPTH, mode=Mode.SUBTRACT)


solid = part.part
